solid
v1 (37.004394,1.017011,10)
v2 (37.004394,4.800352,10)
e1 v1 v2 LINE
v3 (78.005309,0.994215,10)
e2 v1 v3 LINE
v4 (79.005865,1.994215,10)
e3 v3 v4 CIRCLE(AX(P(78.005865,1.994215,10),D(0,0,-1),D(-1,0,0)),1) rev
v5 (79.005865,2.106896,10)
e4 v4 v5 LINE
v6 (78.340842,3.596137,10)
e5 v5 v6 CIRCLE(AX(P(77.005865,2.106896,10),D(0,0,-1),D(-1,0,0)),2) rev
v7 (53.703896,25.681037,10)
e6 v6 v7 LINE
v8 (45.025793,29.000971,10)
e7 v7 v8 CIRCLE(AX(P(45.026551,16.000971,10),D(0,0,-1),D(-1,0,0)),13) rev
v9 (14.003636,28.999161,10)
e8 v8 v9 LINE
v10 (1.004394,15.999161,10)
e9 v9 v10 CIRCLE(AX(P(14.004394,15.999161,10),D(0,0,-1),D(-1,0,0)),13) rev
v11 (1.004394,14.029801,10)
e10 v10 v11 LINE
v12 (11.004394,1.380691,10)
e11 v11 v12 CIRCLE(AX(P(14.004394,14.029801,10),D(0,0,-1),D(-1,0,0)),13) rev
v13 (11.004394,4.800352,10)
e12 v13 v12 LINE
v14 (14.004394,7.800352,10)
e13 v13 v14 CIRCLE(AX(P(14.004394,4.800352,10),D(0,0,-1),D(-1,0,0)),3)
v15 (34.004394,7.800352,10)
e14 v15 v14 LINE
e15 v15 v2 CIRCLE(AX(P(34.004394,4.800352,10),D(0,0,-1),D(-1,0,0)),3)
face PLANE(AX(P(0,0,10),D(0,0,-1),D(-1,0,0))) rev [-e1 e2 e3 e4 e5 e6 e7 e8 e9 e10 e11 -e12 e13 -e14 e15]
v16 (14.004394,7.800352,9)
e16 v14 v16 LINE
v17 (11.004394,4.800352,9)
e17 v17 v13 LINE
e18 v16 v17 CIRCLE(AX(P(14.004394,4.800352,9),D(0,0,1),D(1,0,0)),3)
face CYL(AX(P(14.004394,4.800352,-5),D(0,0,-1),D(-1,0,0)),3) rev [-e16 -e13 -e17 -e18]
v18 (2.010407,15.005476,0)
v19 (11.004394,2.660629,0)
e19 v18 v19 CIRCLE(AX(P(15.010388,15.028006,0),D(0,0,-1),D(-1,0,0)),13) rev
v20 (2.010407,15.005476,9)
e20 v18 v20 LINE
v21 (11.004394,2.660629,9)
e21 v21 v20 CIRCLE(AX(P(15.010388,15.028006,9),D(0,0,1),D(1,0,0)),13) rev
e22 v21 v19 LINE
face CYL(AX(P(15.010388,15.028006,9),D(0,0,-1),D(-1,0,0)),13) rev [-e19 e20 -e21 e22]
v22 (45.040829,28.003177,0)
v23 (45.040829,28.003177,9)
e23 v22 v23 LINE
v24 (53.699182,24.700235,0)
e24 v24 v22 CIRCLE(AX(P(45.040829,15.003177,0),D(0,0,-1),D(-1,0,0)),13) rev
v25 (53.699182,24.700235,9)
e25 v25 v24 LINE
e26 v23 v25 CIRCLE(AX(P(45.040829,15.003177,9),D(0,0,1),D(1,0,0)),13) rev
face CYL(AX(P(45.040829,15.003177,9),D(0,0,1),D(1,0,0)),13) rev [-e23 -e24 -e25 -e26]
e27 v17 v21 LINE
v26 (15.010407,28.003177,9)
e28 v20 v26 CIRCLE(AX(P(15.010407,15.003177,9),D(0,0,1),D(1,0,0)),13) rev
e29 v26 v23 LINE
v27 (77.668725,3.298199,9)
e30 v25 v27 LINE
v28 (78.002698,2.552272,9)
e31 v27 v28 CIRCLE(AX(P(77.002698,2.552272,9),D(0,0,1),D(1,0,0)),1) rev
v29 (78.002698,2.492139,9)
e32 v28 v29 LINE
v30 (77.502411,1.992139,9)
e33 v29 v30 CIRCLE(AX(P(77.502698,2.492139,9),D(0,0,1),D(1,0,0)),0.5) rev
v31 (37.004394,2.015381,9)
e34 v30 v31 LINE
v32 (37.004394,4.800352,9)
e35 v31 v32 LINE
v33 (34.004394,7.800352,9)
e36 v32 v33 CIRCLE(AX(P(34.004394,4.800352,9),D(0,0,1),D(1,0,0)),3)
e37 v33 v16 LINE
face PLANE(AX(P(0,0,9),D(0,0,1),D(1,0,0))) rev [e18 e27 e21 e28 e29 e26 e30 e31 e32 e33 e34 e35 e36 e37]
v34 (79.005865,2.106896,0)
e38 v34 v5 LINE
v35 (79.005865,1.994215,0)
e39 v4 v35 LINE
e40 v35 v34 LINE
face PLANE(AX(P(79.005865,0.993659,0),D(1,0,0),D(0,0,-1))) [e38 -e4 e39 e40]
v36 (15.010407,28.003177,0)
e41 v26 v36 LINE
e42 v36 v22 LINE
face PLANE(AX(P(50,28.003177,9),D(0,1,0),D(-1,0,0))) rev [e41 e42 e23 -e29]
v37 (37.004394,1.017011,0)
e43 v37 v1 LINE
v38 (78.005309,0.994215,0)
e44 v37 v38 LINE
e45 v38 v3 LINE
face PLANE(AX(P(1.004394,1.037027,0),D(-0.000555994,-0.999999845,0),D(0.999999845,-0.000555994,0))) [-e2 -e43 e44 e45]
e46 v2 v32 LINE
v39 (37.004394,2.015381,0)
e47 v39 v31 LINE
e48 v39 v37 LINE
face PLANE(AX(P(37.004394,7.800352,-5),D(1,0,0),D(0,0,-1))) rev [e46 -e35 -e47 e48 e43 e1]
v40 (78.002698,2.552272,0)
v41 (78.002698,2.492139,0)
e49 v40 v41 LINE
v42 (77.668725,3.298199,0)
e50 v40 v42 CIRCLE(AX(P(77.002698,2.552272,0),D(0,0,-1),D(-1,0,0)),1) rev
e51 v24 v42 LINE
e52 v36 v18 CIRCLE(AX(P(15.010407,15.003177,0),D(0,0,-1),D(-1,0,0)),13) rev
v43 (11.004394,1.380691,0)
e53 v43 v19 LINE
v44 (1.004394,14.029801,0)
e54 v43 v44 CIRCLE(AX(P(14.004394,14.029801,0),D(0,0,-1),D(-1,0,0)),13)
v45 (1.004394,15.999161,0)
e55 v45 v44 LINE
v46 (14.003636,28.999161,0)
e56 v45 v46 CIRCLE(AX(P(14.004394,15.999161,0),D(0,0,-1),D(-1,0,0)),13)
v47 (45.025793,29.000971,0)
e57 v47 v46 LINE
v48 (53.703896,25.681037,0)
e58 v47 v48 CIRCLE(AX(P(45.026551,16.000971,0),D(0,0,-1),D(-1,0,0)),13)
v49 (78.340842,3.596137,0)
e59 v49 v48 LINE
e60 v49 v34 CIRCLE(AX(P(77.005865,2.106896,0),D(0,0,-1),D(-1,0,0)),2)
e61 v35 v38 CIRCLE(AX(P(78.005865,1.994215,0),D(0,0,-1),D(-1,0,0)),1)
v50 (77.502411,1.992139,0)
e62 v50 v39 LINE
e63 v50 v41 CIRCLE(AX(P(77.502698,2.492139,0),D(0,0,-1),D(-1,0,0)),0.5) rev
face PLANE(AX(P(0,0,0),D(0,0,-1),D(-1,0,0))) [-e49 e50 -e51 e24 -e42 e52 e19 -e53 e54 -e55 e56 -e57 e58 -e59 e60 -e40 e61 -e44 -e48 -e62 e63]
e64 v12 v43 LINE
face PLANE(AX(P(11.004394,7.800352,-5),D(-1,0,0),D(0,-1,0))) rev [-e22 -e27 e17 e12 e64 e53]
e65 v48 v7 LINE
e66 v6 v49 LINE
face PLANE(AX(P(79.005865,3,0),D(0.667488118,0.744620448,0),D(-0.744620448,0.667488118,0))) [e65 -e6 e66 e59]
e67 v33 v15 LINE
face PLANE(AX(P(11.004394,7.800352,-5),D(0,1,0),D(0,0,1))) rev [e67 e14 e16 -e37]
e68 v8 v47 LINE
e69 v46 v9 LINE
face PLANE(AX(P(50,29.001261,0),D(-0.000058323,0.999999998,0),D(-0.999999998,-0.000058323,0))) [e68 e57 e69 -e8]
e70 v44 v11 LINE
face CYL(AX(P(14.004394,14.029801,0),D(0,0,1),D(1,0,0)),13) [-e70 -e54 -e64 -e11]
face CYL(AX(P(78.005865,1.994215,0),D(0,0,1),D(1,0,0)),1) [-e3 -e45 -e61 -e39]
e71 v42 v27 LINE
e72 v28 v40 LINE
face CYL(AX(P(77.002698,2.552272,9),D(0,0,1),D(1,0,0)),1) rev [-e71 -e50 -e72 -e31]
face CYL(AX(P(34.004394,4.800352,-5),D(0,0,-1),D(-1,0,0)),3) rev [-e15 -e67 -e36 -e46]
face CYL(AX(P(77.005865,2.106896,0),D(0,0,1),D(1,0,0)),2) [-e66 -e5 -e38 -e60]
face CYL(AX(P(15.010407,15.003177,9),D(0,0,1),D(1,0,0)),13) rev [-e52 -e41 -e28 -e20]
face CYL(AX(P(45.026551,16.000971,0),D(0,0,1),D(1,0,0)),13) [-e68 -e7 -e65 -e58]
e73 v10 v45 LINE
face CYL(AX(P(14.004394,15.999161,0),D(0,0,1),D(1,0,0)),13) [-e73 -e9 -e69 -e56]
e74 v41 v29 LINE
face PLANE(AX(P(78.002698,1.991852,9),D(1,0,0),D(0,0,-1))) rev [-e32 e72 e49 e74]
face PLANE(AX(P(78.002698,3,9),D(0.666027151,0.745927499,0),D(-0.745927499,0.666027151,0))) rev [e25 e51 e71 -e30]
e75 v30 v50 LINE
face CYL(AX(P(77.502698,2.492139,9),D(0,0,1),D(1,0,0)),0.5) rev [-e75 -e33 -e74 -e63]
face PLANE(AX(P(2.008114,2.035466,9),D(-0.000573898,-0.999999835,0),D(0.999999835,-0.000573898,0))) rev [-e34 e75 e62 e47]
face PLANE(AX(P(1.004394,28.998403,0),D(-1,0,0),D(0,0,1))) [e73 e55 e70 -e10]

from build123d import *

# Parameters (mm, degrees)
SKETCH1_W               = 80
SKETCH1_H               = 30
BOSS_EXTRUDE1_DEPTH     = 10
CUT_EXTRUDE2_DEPTH      = 87.02325267
CUT_EXTRUDE2_DEPTH_BACK = 10
SKETCH9_OUTSIDE_W       = 99.204
SKETCH9_OUTSIDE_H       = 49.204
CUT_EXTRUDE3_DEPTH      = 10
CUT_EXTRUDE5_DEPTH      = 9
FILLET13_R              = 13
FILLET14_R              = 13
FILLET15_R              = 13
FILLET17_R              = 13
FILLET18_R              = 13
FILLET19_R              = 13
FILLET20_R              = 2
FILLET21_R              = 1
FILLET22_R              = 0.5
FILLET23_R              = 1
SKETCH15_W              = 26
SKETCH15_H              = 7
CUT_EXTRUDE6_DEPTH      = 15
FILLET24_R              = 3
FILLET25_R              = 3


with BuildPart() as part:
    # Sketch1 → Boss-Extrude1 (new body)
    with BuildSketch(Plane.XY):
        with Locations((40, 15)):
            Rectangle(SKETCH1_W, SKETCH1_H)
    extrude(amount=BOSS_EXTRUDE1_DEPTH)

    # Sketch2 → Cut-Extrude2 (cut, two sides: drawn at the far end of the back side and taken through both)
    with BuildSketch(Plane.XY.offset(10).offset(-CUT_EXTRUDE2_DEPTH_BACK)):
        Polygon((50, 30), (80, 3), (80, 30), align=None)
    extrude(amount=CUT_EXTRUDE2_DEPTH + CUT_EXTRUDE2_DEPTH_BACK, mode=Mode.SUBTRACT)

    # Sketch9 outside → Cut-Extrude3 (cut)
    with BuildSketch(Plane.XY.offset(10)):
        with Locations((40, 15)):
            Rectangle(SKETCH9_OUTSIDE_W, SKETCH9_OUTSIDE_H)
        Polygon((1.004393743, 1.037027121), (79.0058654, 0.993658775), (79.0058654, 3), (50, 29.001260854), (1.004393743, 28.998403262), align=None, mode=Mode.SUBTRACT)
    extrude(amount=-CUT_EXTRUDE3_DEPTH, mode=Mode.SUBTRACT)

    # Sketch14 → Cut-Extrude5 (cut)
    with BuildSketch(Plane(origin=(0, 0, 0), x_dir=(-1, 0, 0), z_dir=(0, 0, -1))):
        Polygon((-50, 28.003177056), (-2.012705642, 28.003177056), (-2.00811371, 2.035465522), (-78.002698254, 1.991852338), (-78.002698254, 3), align=None)
    extrude(amount=-CUT_EXTRUDE5_DEPTH, mode=Mode.SUBTRACT)

    # Fillet13
    fillet13_edges = [part.edges().sort_by_distance(p)[0] for p in [
        (2.012705642, 28.003177056, 4.5),
    ]]
    fillet(fillet13_edges, radius=FILLET13_R)

    # Fillet14
    # the kernel refuses this fillet: 13 mm, written as the material it adds along each edge
    with BuildSketch(Plane(origin=(2.00811371, 2.035465522, 0), x_dir=(0.0001768323716472033, 0.999999984365156, 0), z_dir=(0, 0, 1))) as fillet14_piece_1:
        with BuildLine():
            CenterArc((FILLET14_R * 0.999603012675, -FILLET14_R), FILLET14_R, 90, 89.977249786)
            Line((-FILLET14_R * 0.000396908494235, -FILLET14_R * 0.999602933876), (0, 0))
            Line((0, 0), (FILLET14_R * 0.999603012675, 0))
        make_face()
    extrude(amount=9)

    # Fillet15
    fillet15_edges = [part.edges().sort_by_distance(p)[0] for p in [
        (50, 28.003177056, 4.5),
    ]]
    fillet(fillet15_edges, radius=FILLET15_R)

    # Fillet17
    fillet17_edges = [part.edges().sort_by_distance(p)[0] for p in [
        (1.004393743, 28.998403262, 5),
    ]]
    fillet(fillet17_edges, radius=FILLET17_R)

    # Fillet18
    fillet18_edges = [part.edges().sort_by_distance(p)[0] for p in [
        (1.004393743, 1.037027121, 5),
    ]]
    fillet(fillet18_edges, radius=FILLET18_R)

    # Fillet19
    fillet19_edges = [part.edges().sort_by_distance(p)[0] for p in [
        (50, 29.001260854, 5),
    ]]
    fillet(fillet19_edges, radius=FILLET19_R)

    # Fillet20
    fillet20_edges = [part.edges().sort_by_distance(p)[0] for p in [
        (79.0058654, 3, 5),
    ]]
    fillet(fillet20_edges, radius=FILLET20_R)

    # Fillet21
    fillet21_edges = [part.edges().sort_by_distance(p)[0] for p in [
        (79.0058654, 0.993658775, 5),
    ]]
    fillet(fillet21_edges, radius=FILLET21_R)

    # Fillet22
    fillet22_edges = [part.edges().sort_by_distance(p)[0] for p in [
        (78.002698254, 1.991852338, 4.5),
    ]]
    fillet(fillet22_edges, radius=FILLET22_R)

    # Fillet23
    fillet23_edges = [part.edges().sort_by_distance(p)[0] for p in [
        (78.002698254, 3, 4.5),
    ]]
    fillet(fillet23_edges, radius=FILLET23_R)

    # Sketch15 → Cut-Extrude6 (cut)
    with BuildSketch(Plane.XY.offset(10)):
        with Locations((24.004393743, 4.300352014)):
            Rectangle(SKETCH15_W, SKETCH15_H)
    extrude(amount=-CUT_EXTRUDE6_DEPTH, mode=Mode.SUBTRACT)

    # Fillet24
    fillet24_edges = [part.edges().sort_by_distance(p)[0] for p in [
        (11.004393743, 7.800352014, 9.5),
    ]]
    fillet(fillet24_edges, radius=FILLET24_R)

    # Fillet25
    fillet25_edges = [part.edges().sort_by_distance(p)[0] for p in [
        (37.004393743, 7.800352014, 9.5),
    ]]
    fillet(fillet25_edges, radius=FILLET25_R)


solid = part.part
